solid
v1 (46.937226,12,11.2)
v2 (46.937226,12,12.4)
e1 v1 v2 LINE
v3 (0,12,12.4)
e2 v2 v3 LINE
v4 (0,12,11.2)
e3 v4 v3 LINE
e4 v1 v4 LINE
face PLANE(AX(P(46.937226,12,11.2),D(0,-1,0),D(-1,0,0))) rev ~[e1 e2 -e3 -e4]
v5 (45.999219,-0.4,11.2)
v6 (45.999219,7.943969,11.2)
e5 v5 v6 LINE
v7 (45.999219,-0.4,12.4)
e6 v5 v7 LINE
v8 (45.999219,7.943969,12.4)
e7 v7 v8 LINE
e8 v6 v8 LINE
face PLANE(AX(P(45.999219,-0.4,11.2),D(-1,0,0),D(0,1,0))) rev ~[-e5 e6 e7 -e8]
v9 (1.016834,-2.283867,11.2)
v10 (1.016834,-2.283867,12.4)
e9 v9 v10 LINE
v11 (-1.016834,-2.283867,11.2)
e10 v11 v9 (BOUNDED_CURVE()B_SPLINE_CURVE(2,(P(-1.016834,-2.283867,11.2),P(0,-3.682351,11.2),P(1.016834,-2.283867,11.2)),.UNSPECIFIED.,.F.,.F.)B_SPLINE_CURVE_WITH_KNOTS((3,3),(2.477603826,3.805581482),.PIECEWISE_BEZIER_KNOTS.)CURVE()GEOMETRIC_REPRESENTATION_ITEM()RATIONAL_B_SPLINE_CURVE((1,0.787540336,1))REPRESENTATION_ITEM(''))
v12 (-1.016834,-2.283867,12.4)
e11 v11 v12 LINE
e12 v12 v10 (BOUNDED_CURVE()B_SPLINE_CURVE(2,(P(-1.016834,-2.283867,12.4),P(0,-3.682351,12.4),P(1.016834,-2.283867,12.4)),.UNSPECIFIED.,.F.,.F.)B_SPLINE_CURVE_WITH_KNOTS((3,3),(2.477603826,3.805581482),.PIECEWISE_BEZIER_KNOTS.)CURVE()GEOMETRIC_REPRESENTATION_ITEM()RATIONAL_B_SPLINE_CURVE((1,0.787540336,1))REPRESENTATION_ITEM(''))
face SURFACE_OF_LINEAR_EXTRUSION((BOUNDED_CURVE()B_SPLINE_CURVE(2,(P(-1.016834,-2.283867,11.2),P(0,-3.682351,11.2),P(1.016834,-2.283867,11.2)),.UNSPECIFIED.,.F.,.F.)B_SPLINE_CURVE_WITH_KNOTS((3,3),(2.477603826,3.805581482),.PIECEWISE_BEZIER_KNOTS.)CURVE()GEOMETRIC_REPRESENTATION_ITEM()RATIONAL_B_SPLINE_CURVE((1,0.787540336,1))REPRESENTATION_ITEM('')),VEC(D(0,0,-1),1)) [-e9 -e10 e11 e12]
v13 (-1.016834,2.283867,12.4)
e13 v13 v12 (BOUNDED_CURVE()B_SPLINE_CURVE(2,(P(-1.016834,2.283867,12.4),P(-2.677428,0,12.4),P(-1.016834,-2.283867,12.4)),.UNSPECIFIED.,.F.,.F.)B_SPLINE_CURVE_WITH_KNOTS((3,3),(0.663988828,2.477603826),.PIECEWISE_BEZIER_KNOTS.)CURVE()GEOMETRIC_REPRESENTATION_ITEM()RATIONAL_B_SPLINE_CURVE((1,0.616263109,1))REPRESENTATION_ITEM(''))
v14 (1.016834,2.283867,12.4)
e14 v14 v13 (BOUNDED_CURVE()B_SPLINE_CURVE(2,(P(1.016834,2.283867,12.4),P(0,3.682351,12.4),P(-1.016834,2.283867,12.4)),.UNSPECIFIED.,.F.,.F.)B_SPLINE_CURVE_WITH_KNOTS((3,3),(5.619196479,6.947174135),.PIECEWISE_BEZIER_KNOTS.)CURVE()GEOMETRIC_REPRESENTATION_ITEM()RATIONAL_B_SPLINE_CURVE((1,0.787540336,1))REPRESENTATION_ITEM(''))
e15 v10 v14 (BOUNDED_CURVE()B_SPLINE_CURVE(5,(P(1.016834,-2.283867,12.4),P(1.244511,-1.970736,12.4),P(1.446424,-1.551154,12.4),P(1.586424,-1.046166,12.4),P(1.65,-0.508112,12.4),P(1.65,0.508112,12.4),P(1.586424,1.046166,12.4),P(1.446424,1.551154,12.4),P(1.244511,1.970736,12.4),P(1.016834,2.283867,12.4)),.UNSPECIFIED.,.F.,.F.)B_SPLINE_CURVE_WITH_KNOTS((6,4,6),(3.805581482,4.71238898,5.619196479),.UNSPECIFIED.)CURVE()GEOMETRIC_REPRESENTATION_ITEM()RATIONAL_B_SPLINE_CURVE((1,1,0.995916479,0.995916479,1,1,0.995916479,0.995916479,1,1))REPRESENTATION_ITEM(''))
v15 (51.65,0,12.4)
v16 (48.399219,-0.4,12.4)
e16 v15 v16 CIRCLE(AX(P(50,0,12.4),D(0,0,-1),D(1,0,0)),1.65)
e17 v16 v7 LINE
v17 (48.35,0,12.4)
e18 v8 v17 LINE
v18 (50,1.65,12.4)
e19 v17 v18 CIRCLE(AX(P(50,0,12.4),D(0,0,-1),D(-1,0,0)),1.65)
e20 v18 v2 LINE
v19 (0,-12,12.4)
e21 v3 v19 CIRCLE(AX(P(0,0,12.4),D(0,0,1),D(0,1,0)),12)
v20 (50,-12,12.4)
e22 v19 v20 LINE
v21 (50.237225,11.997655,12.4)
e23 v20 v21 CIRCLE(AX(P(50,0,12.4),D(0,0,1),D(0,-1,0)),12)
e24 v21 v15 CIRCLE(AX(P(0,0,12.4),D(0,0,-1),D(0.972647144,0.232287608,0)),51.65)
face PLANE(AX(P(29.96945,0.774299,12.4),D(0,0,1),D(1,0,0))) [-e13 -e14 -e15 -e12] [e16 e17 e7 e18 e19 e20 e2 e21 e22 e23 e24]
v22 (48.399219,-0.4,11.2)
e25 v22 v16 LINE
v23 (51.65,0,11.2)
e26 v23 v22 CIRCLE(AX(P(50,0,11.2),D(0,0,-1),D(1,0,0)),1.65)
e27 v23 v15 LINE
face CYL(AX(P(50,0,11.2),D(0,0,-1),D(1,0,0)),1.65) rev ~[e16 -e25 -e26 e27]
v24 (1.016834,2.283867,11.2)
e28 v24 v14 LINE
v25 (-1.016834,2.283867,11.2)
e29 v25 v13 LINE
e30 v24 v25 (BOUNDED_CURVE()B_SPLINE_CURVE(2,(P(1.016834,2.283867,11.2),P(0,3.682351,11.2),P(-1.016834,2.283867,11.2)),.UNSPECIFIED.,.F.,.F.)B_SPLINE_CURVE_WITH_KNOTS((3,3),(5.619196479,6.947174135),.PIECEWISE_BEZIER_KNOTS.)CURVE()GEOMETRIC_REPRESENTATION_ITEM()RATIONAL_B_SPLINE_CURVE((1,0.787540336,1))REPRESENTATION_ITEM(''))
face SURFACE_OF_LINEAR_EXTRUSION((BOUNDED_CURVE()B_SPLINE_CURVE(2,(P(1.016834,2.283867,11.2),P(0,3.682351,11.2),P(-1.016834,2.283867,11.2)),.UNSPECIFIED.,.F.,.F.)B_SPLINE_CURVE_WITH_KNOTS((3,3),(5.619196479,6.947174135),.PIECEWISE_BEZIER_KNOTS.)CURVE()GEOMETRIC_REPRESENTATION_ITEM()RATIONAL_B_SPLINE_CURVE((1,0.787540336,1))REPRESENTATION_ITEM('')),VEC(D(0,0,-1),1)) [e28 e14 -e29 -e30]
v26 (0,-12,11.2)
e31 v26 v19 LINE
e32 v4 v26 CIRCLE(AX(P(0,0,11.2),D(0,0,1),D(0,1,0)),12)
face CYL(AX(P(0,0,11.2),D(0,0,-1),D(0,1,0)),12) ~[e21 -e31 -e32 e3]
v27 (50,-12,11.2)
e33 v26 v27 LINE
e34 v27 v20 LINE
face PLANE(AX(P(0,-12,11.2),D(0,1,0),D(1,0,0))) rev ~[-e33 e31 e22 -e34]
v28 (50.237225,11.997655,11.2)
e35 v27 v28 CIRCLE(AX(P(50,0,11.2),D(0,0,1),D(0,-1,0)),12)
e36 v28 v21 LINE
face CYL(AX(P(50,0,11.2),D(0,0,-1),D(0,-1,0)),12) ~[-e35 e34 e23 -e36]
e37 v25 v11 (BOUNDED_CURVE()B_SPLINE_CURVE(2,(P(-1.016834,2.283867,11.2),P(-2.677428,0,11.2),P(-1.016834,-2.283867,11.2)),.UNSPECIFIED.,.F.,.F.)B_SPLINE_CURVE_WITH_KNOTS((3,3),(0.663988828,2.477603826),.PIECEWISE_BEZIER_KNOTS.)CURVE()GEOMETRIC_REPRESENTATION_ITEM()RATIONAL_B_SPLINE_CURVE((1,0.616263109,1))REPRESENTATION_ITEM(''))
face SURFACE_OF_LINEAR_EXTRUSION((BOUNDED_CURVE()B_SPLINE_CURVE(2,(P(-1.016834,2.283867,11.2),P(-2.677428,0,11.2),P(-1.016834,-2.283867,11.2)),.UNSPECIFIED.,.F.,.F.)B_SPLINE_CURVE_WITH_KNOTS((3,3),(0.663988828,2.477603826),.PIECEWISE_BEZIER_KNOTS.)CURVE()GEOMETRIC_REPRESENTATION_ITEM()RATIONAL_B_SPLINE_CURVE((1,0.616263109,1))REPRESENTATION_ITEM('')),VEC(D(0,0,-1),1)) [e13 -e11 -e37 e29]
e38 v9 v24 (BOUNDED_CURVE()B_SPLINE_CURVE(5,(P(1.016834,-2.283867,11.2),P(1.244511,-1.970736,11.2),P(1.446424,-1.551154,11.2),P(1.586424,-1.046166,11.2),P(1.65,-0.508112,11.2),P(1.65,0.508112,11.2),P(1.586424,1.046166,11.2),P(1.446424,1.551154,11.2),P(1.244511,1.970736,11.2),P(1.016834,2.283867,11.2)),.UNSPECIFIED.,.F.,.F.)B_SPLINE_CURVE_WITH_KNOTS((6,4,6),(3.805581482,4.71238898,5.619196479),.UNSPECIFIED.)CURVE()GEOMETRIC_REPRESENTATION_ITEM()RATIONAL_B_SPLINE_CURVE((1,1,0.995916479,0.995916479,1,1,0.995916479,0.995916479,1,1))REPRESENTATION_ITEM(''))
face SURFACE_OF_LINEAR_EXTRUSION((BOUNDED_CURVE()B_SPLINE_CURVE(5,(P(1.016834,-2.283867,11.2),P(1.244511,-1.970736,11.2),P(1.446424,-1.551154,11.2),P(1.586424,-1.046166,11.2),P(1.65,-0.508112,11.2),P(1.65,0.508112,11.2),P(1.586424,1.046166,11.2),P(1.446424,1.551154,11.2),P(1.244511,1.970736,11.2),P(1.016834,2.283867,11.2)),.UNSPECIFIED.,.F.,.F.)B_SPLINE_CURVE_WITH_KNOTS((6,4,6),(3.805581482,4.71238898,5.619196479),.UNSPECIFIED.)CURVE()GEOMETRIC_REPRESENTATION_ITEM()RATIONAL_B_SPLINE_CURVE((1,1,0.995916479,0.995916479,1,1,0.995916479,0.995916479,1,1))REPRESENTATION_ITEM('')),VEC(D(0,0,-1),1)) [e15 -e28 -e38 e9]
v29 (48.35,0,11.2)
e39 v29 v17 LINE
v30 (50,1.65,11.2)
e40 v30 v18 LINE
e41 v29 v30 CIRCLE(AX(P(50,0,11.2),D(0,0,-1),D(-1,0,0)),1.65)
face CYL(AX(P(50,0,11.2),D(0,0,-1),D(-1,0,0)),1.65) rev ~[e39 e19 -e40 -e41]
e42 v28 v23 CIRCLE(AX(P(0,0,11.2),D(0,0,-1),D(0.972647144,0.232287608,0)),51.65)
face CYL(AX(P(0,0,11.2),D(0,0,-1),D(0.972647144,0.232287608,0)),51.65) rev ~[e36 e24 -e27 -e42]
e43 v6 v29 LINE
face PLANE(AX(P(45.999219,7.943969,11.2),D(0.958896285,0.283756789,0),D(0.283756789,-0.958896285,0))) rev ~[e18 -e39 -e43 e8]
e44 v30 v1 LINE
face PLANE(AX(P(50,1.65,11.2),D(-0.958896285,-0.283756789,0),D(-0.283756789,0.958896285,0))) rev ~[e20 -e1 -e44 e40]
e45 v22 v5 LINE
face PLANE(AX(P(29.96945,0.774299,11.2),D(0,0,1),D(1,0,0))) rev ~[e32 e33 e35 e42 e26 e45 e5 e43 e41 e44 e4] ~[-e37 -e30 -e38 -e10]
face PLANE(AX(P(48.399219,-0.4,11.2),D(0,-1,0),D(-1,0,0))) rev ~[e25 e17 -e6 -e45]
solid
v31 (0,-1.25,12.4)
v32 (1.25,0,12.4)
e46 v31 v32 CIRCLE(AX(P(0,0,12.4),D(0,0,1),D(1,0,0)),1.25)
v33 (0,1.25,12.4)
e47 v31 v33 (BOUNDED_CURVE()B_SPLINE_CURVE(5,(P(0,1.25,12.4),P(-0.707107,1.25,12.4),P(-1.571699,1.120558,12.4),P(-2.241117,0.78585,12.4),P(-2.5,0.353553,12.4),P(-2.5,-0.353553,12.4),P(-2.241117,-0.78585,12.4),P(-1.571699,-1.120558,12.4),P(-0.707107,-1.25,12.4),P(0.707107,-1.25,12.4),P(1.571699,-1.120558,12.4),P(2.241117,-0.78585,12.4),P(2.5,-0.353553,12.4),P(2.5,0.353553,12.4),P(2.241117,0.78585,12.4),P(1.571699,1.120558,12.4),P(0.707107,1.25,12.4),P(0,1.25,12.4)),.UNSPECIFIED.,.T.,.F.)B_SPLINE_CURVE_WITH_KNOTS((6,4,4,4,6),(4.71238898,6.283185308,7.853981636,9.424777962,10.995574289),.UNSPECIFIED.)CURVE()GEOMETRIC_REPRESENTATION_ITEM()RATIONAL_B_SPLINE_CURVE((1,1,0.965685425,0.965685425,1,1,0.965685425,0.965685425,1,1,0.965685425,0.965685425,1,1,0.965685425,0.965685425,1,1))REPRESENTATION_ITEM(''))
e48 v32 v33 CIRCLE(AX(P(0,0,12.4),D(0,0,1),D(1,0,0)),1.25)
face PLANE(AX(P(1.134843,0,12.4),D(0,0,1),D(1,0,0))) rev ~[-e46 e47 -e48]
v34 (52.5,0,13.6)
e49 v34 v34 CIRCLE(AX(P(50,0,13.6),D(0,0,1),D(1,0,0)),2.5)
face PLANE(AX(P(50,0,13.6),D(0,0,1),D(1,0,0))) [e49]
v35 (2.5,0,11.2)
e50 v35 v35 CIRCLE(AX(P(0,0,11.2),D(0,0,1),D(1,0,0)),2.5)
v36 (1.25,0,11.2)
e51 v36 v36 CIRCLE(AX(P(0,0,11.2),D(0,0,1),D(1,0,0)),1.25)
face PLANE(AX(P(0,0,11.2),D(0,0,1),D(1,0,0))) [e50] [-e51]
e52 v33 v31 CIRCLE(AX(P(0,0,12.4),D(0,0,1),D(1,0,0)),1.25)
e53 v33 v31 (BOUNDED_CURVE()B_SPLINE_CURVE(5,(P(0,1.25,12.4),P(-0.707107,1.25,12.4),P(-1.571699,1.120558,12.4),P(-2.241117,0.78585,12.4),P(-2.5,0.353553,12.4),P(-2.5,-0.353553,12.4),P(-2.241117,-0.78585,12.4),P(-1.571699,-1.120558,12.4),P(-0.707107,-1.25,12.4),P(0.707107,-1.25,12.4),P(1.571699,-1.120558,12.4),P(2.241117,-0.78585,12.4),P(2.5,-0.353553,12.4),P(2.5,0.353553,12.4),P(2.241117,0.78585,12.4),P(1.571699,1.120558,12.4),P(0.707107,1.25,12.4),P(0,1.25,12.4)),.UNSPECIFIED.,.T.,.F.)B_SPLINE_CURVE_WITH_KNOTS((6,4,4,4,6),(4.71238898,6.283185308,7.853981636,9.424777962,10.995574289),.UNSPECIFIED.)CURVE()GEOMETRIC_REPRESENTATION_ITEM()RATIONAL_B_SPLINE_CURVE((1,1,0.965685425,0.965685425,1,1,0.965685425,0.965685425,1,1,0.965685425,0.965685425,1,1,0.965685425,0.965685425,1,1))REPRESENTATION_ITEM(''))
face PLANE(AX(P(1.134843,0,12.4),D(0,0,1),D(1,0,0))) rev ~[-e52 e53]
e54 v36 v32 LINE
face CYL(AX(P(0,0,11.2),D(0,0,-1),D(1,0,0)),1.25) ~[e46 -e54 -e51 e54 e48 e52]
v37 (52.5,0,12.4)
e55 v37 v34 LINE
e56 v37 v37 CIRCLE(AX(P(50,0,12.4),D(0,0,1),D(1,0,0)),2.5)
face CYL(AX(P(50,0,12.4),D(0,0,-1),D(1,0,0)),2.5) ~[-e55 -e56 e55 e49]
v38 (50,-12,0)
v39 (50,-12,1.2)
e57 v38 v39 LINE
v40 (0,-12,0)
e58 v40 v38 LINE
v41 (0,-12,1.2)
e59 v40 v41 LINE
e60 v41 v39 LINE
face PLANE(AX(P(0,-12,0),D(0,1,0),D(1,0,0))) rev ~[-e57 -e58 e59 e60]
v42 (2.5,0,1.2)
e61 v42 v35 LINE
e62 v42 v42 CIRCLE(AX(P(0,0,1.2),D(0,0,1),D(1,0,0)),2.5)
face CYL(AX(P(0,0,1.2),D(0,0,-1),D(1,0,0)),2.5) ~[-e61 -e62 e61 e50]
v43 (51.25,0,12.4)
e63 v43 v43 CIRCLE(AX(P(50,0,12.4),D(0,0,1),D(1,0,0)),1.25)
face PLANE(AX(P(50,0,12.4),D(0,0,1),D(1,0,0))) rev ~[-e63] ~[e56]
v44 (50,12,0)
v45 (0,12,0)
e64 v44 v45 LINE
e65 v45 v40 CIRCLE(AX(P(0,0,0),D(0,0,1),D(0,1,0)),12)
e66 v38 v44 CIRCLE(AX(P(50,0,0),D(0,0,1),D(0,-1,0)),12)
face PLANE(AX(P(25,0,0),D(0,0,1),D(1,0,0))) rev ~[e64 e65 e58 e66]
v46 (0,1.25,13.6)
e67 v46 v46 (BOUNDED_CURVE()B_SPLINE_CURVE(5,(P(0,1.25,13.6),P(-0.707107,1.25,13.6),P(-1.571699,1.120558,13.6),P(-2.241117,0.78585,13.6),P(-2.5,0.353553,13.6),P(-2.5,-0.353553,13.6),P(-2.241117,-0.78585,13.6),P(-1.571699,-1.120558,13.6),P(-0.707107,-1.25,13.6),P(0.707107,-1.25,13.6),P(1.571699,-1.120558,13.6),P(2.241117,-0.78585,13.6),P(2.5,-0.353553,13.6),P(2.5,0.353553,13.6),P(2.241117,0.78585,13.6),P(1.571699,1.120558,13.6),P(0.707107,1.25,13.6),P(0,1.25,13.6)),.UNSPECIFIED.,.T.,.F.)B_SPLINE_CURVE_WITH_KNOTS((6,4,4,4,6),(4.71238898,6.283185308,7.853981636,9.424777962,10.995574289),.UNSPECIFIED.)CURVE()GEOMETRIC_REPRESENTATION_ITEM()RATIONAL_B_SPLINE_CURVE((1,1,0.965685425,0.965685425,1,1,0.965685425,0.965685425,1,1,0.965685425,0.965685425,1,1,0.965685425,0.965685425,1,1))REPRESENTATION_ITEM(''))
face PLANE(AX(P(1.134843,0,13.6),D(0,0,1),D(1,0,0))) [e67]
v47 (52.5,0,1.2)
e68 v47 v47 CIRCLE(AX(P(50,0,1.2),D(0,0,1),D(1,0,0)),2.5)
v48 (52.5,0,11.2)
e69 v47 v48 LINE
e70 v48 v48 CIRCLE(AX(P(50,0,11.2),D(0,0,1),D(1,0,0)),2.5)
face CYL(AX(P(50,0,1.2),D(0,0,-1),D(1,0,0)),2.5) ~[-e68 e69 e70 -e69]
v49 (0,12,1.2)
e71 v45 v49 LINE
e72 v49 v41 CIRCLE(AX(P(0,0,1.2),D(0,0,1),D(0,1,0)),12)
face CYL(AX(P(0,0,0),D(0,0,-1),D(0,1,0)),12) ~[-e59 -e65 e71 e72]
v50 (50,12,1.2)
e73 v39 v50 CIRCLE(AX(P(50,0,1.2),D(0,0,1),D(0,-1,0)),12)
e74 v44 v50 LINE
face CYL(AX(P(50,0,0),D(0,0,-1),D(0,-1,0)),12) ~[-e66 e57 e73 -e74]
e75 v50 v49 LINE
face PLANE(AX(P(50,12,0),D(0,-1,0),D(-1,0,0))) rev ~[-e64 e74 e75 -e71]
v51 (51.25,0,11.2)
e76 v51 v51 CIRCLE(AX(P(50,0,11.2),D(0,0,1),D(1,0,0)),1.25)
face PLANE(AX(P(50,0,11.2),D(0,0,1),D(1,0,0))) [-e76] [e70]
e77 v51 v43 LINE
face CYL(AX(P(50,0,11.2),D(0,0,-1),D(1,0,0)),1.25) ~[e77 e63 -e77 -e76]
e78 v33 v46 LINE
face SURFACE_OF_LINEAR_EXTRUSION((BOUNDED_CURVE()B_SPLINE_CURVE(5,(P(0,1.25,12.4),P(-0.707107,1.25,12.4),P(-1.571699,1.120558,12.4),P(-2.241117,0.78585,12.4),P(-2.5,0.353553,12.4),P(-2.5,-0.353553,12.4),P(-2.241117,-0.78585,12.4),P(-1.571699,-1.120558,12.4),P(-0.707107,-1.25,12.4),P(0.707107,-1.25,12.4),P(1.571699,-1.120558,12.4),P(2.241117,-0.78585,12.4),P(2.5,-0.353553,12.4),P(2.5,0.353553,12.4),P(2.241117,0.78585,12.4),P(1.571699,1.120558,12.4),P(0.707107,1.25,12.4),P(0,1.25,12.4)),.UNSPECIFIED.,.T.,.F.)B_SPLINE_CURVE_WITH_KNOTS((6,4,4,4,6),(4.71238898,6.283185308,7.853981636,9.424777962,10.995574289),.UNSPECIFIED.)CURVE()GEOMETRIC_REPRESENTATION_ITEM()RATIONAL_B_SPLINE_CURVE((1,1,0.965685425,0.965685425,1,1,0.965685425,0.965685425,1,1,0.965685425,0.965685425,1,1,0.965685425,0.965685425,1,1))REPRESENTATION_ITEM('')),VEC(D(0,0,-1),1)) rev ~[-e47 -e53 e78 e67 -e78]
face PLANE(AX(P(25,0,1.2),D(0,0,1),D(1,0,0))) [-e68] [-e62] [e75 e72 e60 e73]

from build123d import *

# Parameters (mm, degrees)
F1_DEPTH  = 1.2
F2_R      = 2.5
F3_DEPTH  = 10
F4_R      = 1.25
F5_R      = 1.25
F6_DEPTH  = 1.2
F8_R      = 2.5
F8_R_2    = 1.25
F9_DEPTH  = 1.2
F11_DEPTH = 1.2


with BuildPart() as f1:
    # F0 (on Top) → F1 (new body)
    with BuildSketch(Plane.XY):
        with BuildLine():
            ThreePointArc((0, 12), (-12, 0), (0, -12))
            Line((0, -12), (50, -12))
            ThreePointArc((50, -12), (62, 0), (50, 12))
            Line((50, 12), (0, 12))
        make_face()
    extrude(amount=F1_DEPTH)

    # F2 (on face) → F3 (join)
    with BuildSketch(Plane.XY.offset(1.2)):
        Circle(F2_R)
        with Locations((50, 0)):
            Circle(F2_R)
    extrude(amount=F3_DEPTH)

    # F4 (on face) + F5 (on face) → F6 (join)
    with BuildSketch(Plane.XY.offset(11.2)):
        Circle(F4_R)
    with BuildSketch(Plane.XY.offset(11.2)):
        with Locations((50, 0)):
            Circle(F5_R)
    extrude(amount=F6_DEPTH)

    # F7 (on face) + F8 (on face) → F9 (join)
    with BuildSketch(Plane.XY.offset(12.4)):
        with BuildLine():
            add(Edge.make_bspline(
                [(4.2e-09, -1.25), (2.5000000021, -1.2499999979), (2.5, 1e-09), (2.4999999979, 1.25), (0, 1.25)],
                knots=[1.5707963285, 1.5707963285, 1.5707963285, 3.1415926544, 3.1415926544, 4.7123889804, 4.7123889804, 4.7123889804], degree=2, weights=[1, 0.7071067815, 1, 0.7071067815, 1]))
            ThreePointArc((0, 1.25), (0.8838834765, 0.8838834765), (1.25, 0))
            ThreePointArc((1.25, 0), (0.883883478, -0.883883475), (4.2e-09, -1.25))
        make_face()
        with BuildLine():
            ThreePointArc((1.25, 0), (0.8838834765, 0.8838834765), (0, 1.25))
            ThreePointArc((0, 1.25), (-1.25, -2.1e-09), (4.2e-09, -1.25))
            ThreePointArc((4.2e-09, -1.25), (0.883883478, -0.883883475), (1.25, 0))
        make_face()
        with BuildLine():
            ThreePointArc((4.2e-09, -1.25), (-1.25, -2.1e-09), (0, 1.25))
            add(Edge.make_bspline(
                [(0, 1.25), (-2.5000000021, 1.25), (-2.5, -1e-09), (-2.4999999979, -1.2500000021), (4.2e-09, -1.25)],
                knots=[4.7123889804, 4.7123889804, 4.7123889804, 6.283185308, 6.283185308, 7.8539816357, 7.8539816357, 7.8539816357], degree=2, weights=[1, 0.7071067809, 1, 0.7071067809, 1]))
        make_face()
    with BuildSketch(Plane.XY.offset(12.4)):
        with Locations((50, 0)):
            Circle(F8_R)
        with Locations((50, 0)):
            Circle(F8_R_2, mode=Mode.SUBTRACT)
        with Locations((50, 0)):
            Circle(F8_R_2)
    extrude(amount=F9_DEPTH)


with BuildPart() as f11:
    # F10 (on face) → F11 (new body)
    with BuildSketch(Plane.XY.offset(11.2)):
        with BuildLine():
            ThreePointArc((0, 12), (-12, 0), (0, -12))
            Line((0, -12), (50, -12))
            ThreePointArc((50, -12), (61.9994137232, -0.1186182953), (50.237225, 11.99765495))
            ThreePointArc((50.237225, 11.99765495), (51.2955903136, 6.0402743626), (51.65, 0))
            ThreePointArc((51.65, 0), (50.2015083771, -1.6376490387), (48.3992189406, -0.4))
            Line((48.3992189406, -0.4), (45.9992189406, -0.4))
            Line((45.9992189406, -0.4), (45.9992189406, 7.9439693035))
            Line((45.9992189406, 7.9439693035), (48.35, 0))
            ThreePointArc((48.35, 0), (48.833273811, 1.166726189), (50, 1.65))
            Line((50, 1.65), (46.9372258332, 12))
            Line((46.9372258332, 12), (0, 12))
        make_face()
        with BuildLine():
            add(Edge.make_bspline(
                [(1.0168341302, 2.2838669733), (0, 3.6823510732), (-1.0168341302, 2.2838669733)],
                knots=[5.6191964791, 5.6191964791, 5.6191964791, 6.9471741352, 6.9471741352, 6.9471741352], degree=2, weights=[1, 0.7875403356, 1]))
            ThreePointArc((1.0168341302, 2.2838669733), (2.0966741909, 1.3616010198), (2.5, 0))
            ThreePointArc((2.5, 0), (2.0966741909, -1.3616010198), (1.0168341302, -2.2838669733))
            add(Edge.make_bspline(
                [(-1.0168341302, -2.2838669733), (0, -3.6823510732), (1.0168341302, -2.2838669733)],
                knots=[2.4776038255, 2.4776038255, 2.4776038255, 3.8055814816, 3.8055814816, 3.8055814816], degree=2, weights=[1, 0.7875403356, 1]))
            ThreePointArc((-1.0168341302, -2.2838669733), (-2.5, 0), (-1.0168341302, 2.2838669733))
        make_face(mode=Mode.SUBTRACT)
        with BuildLine():
            add(Edge.make_bspline(
                [(1.65, 0), (1.65, 1.4130539516), (1.0168341302, 2.2838669733)],
                knots=[4.7123889804, 4.7123889804, 4.7123889804, 5.6191964791, 5.6191964791, 5.6191964791], degree=2, weights=[1, 0.8989613755, 1]))
            add(Edge.make_bspline(
                [(1.0168341302, -2.2838669733), (1.65, -1.4130539516), (1.65, 0)],
                knots=[3.8055814816, 3.8055814816, 3.8055814816, 4.7123889804, 4.7123889804, 4.7123889804], degree=2, weights=[1, 0.8989613755, 1]))
            ThreePointArc((1.0168341302, -2.2838669733), (2.0966741909, -1.3616010198), (2.5, 0))
            ThreePointArc((2.5, 0), (2.0966741909, 1.3616010198), (1.0168341302, 2.2838669733))
        make_face()
        with BuildLine():
            add(Edge.make_bspline(
                [(-1.0168341302, 2.2838669733), (-2.6774278313, 0), (-1.0168341302, -2.2838669733)],
                knots=[0.663988828, 0.663988828, 0.663988828, 2.4776038255, 2.4776038255, 2.4776038255], degree=2, weights=[1, 0.6162631092, 1]))
            ThreePointArc((-1.0168341302, 2.2838669733), (-2.5, 0), (-1.0168341302, -2.2838669733))
        make_face()
    extrude(amount=F11_DEPTH)


solid = Compound([f1.part, f11.part])
